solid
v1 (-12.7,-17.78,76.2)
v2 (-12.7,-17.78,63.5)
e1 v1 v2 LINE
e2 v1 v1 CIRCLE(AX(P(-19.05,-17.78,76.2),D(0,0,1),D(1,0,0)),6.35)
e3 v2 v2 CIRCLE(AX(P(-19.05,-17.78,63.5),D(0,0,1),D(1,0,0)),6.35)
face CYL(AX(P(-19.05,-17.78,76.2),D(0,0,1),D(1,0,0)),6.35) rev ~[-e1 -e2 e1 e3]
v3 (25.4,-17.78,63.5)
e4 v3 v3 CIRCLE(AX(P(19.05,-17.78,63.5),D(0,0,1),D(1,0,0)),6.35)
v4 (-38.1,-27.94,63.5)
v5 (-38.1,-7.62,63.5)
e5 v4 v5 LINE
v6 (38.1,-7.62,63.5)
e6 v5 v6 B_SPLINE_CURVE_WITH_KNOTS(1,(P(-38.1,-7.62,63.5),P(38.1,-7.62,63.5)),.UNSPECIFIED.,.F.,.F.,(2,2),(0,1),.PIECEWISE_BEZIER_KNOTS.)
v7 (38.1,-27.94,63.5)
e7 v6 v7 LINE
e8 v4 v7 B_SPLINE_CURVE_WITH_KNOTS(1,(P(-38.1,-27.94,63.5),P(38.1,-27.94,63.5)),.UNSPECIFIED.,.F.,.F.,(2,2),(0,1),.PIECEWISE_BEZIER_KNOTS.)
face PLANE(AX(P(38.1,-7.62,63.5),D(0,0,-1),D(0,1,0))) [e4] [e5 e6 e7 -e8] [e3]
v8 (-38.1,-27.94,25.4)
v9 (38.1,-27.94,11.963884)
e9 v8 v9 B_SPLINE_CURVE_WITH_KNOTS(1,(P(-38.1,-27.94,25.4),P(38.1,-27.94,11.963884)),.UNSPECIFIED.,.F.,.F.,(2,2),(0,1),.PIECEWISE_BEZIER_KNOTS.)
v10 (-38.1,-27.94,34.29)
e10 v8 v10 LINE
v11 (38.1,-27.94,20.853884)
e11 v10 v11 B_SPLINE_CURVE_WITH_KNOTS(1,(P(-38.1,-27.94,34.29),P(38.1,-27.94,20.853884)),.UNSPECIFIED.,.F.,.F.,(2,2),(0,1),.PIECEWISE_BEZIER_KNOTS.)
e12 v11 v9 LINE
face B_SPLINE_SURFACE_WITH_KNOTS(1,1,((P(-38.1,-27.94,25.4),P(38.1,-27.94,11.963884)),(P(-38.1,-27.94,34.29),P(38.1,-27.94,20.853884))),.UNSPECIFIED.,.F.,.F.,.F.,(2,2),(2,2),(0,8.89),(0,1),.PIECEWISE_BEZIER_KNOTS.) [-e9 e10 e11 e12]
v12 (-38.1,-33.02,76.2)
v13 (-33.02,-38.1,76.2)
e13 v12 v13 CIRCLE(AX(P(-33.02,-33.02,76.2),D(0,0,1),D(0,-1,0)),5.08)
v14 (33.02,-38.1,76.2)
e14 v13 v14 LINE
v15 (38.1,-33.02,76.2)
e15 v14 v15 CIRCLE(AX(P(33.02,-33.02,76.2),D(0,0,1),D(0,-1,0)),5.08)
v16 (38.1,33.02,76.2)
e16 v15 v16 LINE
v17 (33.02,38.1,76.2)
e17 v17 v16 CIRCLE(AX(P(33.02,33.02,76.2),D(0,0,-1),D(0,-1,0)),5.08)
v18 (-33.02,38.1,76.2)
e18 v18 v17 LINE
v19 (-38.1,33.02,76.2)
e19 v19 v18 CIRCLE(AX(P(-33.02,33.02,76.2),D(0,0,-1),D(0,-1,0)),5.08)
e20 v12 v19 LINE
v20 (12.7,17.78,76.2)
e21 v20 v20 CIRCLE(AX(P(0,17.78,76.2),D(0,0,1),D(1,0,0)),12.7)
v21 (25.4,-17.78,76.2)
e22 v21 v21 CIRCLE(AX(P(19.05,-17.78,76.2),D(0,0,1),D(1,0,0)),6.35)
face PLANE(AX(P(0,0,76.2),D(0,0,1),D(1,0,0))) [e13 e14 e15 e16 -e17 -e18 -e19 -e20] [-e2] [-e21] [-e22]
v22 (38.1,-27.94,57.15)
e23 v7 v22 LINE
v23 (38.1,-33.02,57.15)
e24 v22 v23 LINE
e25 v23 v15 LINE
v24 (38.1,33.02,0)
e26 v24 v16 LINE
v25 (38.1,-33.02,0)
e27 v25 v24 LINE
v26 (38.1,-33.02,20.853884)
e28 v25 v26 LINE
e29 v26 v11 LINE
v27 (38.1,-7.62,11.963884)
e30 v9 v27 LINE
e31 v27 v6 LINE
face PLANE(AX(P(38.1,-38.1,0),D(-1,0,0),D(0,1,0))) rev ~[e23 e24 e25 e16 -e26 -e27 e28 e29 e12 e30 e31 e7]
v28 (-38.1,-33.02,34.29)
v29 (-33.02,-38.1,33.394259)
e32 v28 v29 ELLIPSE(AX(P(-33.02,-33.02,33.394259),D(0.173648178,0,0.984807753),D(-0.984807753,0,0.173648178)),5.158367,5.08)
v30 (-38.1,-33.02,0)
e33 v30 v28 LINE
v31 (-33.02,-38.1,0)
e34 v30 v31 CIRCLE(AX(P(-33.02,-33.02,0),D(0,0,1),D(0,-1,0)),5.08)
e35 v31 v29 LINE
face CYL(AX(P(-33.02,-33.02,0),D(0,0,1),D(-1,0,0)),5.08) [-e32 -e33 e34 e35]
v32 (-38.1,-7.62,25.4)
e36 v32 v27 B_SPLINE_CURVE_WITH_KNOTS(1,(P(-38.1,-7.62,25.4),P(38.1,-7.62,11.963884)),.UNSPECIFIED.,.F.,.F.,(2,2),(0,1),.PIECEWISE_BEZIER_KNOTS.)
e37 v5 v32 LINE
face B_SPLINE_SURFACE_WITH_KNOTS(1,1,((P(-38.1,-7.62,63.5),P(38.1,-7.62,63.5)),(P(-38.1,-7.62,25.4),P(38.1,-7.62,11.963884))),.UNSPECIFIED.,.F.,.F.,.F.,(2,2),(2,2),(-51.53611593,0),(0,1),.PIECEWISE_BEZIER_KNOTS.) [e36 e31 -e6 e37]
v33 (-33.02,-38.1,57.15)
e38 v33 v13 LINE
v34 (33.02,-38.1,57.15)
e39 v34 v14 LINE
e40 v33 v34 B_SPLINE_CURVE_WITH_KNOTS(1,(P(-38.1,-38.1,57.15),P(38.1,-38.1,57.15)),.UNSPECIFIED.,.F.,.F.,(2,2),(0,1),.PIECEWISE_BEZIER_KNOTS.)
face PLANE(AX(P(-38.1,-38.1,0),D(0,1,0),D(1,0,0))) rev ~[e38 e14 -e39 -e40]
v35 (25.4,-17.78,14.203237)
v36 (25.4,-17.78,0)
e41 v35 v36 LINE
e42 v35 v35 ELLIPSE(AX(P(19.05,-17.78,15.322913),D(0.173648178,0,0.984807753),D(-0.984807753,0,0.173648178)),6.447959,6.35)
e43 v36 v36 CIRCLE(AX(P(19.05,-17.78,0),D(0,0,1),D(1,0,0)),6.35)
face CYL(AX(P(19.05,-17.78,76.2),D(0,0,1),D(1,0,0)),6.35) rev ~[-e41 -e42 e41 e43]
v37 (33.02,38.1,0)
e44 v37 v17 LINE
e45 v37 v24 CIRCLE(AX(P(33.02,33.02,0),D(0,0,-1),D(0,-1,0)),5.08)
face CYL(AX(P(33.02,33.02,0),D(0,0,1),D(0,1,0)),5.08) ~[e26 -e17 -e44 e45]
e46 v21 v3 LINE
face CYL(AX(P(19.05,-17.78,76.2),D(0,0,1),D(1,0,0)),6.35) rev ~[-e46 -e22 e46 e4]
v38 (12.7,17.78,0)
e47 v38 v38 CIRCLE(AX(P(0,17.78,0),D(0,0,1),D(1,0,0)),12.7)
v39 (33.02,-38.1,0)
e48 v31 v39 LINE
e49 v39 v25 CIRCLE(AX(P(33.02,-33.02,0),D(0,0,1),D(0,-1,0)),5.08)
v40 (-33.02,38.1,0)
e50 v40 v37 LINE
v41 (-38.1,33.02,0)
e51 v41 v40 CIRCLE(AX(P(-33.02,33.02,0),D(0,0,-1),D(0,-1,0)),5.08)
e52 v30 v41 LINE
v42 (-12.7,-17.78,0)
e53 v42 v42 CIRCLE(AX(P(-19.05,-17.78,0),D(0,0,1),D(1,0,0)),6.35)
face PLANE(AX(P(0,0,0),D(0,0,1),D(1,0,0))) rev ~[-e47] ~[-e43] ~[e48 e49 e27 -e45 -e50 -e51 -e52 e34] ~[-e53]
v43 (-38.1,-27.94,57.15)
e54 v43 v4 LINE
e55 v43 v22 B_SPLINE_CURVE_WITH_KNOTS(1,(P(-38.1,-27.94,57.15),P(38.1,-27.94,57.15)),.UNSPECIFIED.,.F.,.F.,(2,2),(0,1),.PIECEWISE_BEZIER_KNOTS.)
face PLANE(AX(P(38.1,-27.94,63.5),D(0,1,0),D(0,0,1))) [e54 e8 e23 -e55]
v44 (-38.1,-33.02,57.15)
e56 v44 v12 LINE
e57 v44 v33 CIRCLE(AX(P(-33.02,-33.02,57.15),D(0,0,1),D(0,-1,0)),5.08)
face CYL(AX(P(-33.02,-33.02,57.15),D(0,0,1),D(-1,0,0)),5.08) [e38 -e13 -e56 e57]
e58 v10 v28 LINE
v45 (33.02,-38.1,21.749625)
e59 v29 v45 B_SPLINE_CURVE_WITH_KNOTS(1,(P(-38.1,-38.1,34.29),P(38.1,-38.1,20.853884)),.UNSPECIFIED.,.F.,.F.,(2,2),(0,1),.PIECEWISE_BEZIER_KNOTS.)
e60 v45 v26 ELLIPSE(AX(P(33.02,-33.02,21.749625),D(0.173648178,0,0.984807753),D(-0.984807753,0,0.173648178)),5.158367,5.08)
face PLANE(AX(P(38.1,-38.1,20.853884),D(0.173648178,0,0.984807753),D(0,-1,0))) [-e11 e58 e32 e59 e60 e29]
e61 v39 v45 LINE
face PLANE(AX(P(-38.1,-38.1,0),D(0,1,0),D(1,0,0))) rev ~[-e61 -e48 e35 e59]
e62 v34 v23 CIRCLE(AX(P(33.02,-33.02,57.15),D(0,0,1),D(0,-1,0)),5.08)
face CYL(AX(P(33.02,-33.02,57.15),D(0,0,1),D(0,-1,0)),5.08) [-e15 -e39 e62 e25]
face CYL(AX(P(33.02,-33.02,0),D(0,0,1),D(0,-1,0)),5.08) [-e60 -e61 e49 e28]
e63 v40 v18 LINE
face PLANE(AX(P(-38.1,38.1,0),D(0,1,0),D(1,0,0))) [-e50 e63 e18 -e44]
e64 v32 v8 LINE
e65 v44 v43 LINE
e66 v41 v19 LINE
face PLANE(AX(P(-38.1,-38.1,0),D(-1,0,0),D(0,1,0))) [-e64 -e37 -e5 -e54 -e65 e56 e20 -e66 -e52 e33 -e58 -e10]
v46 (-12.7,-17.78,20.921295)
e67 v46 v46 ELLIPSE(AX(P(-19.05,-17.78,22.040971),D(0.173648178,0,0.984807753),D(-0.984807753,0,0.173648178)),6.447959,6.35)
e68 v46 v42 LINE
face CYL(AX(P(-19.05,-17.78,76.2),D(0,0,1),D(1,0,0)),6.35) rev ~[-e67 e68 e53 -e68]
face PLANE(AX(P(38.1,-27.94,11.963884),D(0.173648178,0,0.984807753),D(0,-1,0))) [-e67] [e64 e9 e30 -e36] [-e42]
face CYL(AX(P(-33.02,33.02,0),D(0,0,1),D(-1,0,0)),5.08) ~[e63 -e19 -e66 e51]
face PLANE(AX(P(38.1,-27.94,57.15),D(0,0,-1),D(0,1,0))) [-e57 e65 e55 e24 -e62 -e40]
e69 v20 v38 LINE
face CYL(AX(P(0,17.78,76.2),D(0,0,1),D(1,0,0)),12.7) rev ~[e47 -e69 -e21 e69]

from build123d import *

# Parameters (mm, degrees)
F0_W     = 76.2
F0_H     = 76.2
F1_DEPTH = 76.2
F6_R     = 6.35
F6_R_2   = 12.7
F7_DEPTH = 76.2010001
F8_R     = 5.08


with BuildPart() as f1:
    # F0 (on Top) → F1 (new body)
    with BuildSketch(Plane.XY):
        Rectangle(F0_W, F0_H)
    extrude(amount=F1_DEPTH)

    # F2 (on face) → F5 section 0
    with BuildSketch(Plane(origin=(-38.1, 0, 0), x_dir=(0, -1, 0), z_dir=(-1, 0, 0))):
        Polygon((38.1, 34.29), (38.1, 57.15), (27.94, 57.15), (27.94, 63.5), (7.62, 63.5), (7.62, 25.4), (27.94, 25.4), (27.94, 34.29), align=None)
    # F4 (on face) → F5 section 1
    with BuildSketch(Plane.YZ.offset(38.1)):
        Polygon((-27.94, 57.15), (-38.1, 57.15), (-38.1, 20.85388407), (-27.94, 20.85388407), (-27.94, 11.96388407), (-7.62, 11.96388407), (-7.62, 63.5), (-27.94, 63.5), align=None)
    loft(mode=Mode.SUBTRACT)

    # F6 (on face) → F7 (cut, through all)
    with BuildSketch(Plane.XY.offset(76.2)):
        with Locations((-19.05, -17.78)):
            Circle(F6_R)
        with Locations((19.05, -17.78)):
            Circle(F6_R)
        with Locations((0, 17.78)):
            Circle(F6_R_2)
    extrude(amount=-F7_DEPTH, mode=Mode.SUBTRACT)

    # F8
    f8_edges = [f1.edges().sort_by_distance(p)[0] for p in [
        (38.1, 38.1, 38.1),
        (-38.1, 38.1, 38.1),
        (38.1, -38.1, 10.426942),
        (-38.1, -38.1, 17.145),
        (38.1, -38.1, 66.675),
        (-38.1, -38.1, 66.675),
    ]]
    fillet(f8_edges, radius=F8_R)


solid = f1.part
